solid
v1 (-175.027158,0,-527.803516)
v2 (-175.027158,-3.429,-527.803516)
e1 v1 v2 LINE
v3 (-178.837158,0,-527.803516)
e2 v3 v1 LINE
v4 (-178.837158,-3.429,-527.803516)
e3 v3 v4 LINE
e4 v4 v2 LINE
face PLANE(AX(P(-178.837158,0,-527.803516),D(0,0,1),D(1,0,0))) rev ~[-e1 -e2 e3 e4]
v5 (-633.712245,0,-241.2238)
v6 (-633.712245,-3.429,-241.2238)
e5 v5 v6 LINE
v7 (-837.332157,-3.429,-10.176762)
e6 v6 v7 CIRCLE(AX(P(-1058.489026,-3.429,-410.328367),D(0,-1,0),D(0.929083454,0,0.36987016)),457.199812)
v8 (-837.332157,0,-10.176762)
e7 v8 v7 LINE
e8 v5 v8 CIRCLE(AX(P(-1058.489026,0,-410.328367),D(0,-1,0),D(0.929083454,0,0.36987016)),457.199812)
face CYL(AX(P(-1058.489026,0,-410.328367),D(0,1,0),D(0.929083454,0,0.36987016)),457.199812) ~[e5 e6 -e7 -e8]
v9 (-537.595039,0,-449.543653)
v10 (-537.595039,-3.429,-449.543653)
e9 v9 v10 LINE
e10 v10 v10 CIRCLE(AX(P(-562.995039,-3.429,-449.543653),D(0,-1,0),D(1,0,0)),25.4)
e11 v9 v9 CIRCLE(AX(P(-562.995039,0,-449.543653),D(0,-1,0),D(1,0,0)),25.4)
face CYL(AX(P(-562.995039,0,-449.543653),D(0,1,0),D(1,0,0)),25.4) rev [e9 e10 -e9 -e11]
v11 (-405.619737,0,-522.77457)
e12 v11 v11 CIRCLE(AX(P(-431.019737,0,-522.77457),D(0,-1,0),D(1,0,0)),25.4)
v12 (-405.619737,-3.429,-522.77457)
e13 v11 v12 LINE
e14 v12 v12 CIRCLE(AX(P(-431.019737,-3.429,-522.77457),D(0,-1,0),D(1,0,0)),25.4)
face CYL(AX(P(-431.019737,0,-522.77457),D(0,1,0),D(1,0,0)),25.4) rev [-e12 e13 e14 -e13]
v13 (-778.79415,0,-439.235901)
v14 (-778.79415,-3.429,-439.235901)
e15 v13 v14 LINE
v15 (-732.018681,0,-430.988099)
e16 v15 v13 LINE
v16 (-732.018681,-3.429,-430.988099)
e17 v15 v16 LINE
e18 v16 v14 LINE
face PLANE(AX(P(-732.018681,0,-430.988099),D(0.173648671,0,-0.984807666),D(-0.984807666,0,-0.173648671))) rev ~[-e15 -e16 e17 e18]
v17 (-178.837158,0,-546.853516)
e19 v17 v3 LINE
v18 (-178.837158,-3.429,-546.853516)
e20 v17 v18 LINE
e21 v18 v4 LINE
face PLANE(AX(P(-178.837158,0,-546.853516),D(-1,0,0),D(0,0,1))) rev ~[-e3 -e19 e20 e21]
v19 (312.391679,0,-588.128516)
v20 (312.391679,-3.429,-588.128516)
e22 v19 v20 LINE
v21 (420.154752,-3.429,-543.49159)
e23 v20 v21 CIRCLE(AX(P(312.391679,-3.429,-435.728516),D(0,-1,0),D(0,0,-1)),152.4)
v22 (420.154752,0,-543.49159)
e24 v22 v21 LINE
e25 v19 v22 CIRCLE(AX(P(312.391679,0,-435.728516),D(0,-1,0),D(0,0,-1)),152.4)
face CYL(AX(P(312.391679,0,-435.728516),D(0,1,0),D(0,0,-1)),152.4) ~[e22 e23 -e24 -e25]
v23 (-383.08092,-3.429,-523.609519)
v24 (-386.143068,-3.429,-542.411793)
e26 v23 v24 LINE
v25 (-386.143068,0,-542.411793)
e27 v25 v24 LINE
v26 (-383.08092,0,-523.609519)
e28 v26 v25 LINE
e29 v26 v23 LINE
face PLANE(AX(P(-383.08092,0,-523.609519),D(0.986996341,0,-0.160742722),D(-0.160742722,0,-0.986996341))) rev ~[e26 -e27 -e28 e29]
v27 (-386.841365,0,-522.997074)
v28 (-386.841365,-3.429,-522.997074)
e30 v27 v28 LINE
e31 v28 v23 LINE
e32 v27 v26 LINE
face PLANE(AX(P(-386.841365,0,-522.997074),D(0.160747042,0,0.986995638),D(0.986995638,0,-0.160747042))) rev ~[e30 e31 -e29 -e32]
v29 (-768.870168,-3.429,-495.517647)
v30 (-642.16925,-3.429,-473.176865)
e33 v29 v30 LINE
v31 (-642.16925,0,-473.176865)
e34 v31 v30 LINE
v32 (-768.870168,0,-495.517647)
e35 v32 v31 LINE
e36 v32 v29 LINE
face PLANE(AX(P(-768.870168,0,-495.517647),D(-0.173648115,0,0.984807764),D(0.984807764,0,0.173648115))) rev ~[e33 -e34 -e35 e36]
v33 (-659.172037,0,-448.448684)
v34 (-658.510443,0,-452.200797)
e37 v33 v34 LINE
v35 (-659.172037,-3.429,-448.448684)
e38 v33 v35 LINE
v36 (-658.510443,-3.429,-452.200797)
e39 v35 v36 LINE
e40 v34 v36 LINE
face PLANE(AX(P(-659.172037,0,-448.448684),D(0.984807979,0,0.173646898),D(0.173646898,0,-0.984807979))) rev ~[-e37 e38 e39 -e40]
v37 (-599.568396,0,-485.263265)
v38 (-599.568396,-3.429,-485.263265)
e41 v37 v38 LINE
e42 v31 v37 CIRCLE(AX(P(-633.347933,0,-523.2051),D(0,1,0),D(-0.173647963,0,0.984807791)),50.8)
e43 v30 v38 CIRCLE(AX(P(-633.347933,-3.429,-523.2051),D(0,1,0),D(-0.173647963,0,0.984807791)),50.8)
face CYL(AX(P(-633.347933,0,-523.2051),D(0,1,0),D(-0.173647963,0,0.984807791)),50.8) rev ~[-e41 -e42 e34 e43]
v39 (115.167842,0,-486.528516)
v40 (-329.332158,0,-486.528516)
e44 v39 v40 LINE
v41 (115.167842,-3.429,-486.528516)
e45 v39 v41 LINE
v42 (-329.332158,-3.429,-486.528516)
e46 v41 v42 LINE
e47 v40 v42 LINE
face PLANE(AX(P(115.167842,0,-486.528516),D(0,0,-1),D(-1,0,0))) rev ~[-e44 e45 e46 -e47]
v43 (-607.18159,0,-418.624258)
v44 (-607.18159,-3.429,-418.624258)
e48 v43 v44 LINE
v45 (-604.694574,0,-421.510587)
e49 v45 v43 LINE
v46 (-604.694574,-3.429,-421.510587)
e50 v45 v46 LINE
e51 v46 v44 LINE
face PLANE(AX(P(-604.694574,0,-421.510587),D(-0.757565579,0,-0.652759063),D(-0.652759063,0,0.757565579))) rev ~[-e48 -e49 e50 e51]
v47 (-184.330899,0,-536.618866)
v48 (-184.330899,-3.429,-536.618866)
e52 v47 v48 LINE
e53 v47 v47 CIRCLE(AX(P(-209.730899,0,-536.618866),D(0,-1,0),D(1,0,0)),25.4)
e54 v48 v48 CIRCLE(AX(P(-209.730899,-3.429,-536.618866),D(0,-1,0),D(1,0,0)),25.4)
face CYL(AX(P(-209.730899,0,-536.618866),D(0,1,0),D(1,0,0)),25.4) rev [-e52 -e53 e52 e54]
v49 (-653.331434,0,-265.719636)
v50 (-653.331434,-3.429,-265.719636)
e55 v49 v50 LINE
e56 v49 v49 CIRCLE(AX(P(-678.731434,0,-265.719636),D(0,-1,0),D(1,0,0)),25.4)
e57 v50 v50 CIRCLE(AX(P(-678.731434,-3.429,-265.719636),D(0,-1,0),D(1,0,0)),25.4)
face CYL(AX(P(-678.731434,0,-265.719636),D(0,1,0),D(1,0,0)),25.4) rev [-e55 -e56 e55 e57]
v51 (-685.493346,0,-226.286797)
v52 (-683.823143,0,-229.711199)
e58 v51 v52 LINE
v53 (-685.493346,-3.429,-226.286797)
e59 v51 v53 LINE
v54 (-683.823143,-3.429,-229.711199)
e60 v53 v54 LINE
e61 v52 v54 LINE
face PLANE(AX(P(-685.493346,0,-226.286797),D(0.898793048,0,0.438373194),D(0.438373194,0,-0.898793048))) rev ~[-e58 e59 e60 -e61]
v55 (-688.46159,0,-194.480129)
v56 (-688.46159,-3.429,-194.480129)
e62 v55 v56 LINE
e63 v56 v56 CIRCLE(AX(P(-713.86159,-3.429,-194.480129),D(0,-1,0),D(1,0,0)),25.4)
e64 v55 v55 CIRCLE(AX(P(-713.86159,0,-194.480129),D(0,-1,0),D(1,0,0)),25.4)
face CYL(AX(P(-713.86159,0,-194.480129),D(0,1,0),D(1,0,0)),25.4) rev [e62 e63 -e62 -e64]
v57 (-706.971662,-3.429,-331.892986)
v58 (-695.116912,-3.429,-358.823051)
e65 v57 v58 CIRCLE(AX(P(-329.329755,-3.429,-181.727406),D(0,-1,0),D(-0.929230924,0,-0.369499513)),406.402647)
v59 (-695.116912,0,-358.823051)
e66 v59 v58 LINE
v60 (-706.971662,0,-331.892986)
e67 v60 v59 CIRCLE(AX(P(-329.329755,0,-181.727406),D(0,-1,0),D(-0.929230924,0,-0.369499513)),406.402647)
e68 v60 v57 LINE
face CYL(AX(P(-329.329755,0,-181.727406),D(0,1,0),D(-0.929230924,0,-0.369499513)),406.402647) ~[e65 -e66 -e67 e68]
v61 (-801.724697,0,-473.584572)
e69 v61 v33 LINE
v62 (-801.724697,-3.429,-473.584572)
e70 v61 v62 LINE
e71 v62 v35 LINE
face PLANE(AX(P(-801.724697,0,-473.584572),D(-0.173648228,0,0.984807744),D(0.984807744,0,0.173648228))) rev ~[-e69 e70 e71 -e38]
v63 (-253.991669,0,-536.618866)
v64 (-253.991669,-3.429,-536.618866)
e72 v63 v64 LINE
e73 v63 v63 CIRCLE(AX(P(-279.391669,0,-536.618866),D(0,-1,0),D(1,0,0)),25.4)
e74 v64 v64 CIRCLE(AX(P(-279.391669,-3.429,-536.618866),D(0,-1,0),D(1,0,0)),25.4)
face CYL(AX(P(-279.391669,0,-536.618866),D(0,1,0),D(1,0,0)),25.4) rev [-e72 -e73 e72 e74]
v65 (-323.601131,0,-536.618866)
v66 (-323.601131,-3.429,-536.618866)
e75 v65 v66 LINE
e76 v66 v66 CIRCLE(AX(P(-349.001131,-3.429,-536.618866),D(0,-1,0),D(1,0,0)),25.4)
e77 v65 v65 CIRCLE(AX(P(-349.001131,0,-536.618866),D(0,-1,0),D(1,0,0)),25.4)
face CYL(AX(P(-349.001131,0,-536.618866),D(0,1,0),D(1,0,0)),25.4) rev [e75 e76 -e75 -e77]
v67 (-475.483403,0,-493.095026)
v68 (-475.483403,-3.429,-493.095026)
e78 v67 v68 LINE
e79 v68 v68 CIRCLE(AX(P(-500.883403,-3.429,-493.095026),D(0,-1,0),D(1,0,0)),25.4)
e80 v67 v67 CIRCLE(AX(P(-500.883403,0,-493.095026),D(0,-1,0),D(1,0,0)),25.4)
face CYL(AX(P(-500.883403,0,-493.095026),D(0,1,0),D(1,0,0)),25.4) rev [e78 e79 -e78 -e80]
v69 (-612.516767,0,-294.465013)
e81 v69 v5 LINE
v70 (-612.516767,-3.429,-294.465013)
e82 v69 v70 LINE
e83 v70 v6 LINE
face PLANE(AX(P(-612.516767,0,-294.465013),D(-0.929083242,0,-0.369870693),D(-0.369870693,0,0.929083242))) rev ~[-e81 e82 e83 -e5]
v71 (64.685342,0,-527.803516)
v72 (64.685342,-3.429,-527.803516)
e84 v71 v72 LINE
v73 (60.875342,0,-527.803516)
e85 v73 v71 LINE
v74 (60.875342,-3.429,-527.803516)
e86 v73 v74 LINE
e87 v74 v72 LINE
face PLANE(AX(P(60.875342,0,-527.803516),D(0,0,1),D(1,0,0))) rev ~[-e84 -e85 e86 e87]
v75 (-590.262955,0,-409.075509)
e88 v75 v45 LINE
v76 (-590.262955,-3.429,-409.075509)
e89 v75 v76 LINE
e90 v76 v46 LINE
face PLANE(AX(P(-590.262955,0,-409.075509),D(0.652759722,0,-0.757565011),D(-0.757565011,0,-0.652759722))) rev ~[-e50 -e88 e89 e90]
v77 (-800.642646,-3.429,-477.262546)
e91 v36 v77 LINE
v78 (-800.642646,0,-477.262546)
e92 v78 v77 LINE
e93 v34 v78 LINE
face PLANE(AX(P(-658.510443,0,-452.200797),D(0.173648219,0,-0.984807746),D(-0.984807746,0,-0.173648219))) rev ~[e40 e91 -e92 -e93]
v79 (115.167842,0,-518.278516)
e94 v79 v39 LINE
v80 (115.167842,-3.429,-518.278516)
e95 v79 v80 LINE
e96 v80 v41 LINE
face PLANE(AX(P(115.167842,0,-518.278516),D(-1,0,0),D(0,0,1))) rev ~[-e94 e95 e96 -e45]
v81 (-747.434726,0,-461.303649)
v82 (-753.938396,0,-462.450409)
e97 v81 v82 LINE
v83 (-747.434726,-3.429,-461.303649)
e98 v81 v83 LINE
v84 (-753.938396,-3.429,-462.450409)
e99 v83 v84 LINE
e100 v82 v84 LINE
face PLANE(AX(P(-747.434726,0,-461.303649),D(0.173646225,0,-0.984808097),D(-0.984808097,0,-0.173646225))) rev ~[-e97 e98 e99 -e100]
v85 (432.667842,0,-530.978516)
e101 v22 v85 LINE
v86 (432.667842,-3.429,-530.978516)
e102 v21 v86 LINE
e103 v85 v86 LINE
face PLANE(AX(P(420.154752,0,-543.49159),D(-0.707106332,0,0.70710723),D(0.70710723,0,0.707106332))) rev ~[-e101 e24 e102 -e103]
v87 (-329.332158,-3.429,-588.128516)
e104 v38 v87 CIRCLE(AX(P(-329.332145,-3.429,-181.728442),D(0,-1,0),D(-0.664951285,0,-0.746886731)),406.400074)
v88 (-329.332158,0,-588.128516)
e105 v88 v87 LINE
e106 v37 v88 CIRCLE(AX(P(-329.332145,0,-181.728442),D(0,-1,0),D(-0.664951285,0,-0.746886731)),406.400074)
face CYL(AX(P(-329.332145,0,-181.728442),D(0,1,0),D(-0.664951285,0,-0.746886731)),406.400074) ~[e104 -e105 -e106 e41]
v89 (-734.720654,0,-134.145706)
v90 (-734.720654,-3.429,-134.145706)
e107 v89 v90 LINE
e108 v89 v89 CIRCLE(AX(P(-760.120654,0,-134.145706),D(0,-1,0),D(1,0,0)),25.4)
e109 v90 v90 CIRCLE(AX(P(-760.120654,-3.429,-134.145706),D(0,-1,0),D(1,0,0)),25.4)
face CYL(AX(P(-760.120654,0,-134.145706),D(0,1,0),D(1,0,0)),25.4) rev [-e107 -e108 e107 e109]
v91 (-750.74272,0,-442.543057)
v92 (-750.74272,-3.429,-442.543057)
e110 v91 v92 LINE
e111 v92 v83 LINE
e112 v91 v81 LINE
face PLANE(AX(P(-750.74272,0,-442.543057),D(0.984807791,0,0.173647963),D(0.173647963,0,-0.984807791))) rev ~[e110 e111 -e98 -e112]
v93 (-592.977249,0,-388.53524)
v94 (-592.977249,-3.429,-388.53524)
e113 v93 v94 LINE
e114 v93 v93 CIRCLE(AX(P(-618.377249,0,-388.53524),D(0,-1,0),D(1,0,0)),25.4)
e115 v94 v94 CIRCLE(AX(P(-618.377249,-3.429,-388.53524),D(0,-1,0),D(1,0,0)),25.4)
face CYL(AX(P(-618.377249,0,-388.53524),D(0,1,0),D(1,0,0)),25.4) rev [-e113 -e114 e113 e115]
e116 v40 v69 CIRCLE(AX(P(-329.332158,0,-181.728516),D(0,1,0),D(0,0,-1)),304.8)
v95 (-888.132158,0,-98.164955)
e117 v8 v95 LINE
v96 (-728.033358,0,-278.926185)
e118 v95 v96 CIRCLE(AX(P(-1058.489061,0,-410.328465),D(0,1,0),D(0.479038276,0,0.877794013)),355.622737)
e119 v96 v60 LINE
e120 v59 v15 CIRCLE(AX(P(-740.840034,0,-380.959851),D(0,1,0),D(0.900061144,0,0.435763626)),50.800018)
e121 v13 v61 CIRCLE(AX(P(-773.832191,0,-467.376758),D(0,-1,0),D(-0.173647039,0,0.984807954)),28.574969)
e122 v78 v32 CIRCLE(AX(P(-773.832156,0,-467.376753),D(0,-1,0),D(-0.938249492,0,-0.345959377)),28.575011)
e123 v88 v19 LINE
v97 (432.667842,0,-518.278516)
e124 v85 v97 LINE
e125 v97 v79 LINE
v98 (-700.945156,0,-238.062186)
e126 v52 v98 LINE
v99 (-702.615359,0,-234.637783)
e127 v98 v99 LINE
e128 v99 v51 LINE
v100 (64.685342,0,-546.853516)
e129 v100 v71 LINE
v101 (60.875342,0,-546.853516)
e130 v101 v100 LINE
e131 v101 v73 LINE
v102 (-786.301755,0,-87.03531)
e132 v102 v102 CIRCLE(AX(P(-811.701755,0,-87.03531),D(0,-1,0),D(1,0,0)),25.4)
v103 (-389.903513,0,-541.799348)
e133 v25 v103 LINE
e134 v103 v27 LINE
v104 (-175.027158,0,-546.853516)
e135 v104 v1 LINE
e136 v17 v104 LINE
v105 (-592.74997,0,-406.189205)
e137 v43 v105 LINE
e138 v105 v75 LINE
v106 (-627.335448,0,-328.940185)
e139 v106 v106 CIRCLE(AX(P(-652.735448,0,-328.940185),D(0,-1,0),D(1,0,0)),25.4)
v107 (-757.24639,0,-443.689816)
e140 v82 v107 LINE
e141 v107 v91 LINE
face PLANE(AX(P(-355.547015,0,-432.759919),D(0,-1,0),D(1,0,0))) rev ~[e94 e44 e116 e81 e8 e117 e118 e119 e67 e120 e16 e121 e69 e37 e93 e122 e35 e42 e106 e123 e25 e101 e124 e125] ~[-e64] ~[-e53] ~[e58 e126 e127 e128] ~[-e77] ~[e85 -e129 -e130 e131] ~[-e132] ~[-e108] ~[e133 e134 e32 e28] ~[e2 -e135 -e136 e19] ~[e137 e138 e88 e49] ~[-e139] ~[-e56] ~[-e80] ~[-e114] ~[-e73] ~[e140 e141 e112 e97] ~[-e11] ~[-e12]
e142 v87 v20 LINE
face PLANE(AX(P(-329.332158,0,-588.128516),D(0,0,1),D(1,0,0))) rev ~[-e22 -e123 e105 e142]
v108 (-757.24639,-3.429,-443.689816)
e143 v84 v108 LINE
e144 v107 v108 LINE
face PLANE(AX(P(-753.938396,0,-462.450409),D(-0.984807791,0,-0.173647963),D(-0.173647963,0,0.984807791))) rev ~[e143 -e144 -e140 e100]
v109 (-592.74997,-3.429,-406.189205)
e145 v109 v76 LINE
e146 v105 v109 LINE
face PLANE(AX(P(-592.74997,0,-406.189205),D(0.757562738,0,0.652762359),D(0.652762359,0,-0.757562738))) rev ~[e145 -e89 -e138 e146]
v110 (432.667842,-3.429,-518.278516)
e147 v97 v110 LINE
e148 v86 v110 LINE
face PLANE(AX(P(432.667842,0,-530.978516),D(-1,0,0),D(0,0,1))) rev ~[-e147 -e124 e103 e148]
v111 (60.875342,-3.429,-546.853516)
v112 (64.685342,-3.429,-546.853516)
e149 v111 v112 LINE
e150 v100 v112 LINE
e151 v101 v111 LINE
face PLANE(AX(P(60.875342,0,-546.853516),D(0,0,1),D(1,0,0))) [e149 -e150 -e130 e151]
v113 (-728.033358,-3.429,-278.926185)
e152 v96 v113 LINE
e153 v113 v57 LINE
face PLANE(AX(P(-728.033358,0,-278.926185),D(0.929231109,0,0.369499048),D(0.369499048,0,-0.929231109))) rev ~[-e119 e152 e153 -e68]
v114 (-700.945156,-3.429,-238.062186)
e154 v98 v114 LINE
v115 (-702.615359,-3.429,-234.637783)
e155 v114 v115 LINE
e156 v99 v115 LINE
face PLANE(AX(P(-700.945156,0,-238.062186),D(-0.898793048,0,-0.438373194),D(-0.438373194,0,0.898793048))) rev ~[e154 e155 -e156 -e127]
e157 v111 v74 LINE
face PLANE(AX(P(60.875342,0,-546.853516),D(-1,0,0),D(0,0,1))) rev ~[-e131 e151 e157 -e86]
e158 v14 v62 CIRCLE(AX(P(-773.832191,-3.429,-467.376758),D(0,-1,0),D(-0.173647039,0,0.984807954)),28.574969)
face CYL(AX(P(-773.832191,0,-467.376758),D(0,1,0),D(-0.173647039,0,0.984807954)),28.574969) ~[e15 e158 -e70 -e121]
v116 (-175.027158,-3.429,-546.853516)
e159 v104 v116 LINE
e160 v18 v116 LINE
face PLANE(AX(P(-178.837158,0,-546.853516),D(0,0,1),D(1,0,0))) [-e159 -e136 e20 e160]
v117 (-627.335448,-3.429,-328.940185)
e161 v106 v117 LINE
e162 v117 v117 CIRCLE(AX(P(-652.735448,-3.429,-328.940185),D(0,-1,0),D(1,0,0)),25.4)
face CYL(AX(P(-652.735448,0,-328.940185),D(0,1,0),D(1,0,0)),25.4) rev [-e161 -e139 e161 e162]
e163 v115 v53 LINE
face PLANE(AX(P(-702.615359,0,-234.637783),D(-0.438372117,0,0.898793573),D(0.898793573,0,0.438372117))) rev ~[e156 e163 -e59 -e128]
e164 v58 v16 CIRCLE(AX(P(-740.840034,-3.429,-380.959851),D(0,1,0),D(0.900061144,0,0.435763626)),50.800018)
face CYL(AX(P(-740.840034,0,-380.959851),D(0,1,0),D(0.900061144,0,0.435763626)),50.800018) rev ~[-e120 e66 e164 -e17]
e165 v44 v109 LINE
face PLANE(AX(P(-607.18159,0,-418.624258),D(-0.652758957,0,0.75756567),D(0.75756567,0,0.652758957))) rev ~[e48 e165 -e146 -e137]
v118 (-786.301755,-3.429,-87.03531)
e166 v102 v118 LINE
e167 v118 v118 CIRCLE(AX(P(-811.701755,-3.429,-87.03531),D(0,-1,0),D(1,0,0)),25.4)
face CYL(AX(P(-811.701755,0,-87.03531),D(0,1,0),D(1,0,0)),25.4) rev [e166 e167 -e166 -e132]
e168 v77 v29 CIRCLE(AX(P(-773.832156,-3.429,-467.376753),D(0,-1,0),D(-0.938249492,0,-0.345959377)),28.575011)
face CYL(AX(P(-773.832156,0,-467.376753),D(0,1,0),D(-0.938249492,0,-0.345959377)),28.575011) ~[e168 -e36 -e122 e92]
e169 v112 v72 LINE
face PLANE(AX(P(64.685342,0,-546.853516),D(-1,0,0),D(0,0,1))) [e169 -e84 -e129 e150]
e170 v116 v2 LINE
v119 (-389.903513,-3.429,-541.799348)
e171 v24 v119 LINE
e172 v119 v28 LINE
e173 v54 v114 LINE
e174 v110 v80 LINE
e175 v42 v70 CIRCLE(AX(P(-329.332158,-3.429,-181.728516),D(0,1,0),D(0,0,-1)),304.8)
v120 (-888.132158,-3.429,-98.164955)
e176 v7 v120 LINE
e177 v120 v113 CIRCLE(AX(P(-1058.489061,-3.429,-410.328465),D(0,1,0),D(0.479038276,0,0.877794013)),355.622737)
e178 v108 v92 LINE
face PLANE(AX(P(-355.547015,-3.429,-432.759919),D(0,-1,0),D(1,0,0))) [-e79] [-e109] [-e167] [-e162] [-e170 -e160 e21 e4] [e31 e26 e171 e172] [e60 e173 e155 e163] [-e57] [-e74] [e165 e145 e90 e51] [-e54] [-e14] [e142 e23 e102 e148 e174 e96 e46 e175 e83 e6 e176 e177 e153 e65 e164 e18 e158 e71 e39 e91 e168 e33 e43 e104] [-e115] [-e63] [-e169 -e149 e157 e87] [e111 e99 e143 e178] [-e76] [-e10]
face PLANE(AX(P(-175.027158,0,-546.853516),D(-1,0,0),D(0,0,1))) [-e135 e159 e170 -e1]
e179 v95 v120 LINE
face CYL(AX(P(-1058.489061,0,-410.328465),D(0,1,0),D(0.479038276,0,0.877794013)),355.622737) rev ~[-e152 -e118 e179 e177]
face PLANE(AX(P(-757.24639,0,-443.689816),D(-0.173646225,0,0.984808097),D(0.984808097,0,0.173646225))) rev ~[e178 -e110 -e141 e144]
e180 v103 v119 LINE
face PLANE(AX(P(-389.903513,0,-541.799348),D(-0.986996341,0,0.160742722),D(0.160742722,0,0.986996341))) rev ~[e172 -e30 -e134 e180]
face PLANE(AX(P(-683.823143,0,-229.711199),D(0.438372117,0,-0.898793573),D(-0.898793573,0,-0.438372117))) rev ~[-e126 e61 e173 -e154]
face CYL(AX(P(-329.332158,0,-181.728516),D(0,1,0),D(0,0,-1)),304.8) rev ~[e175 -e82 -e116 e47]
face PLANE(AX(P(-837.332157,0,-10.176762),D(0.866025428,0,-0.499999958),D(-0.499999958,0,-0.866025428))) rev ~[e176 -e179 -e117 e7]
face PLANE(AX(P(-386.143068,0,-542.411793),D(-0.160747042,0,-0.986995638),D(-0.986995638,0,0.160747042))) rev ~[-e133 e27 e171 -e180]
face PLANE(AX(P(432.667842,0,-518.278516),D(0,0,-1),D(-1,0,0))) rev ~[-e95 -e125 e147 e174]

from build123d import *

# Parameters (mm, degrees)
F0_R     = 25.4
F0_W     = 3.81
F0_H     = 19.05
F1_DEPTH = 3.429


# Not quite as in the source:
# - ends of sketch curves that miss each other by under 0.0002 mm in the source are joined


with BuildPart() as f1:
    # F0 (on Front) → F1 (new body)
    with BuildSketch(Plane.XZ):
        with BuildLine():
            ThreePointArc((-642.1692497265, -473.1768646252), (-619.4825639758, -474.3339275445), (-599.5683960075, -485.2632650852))
            ThreePointArc((-599.5683960075, -485.2632650852), (-473.9081608396, -561.5426017902), (-329.3321582, -588.1285164))
            Line((-329.3321582, -588.1285164), (312.391679, -588.1285164))
            ThreePointArc((312.391679, -588.1285164), (370.7126340924, -576.5277571547), (420.1547524528, -543.4915898528))
            Line((420.1547524528, -543.4915898528), (432.6678418, -530.9785164))
            Line((432.6678418, -530.9785164), (432.6678418, -518.2785164))
            Line((432.6678418, -518.2785164), (115.1678418, -518.2785164))
            Line((115.1678418, -518.2785164), (115.1678418, -486.5285164))
            Line((115.1678418, -486.5285164), (-329.3321582, -486.5285164))
            ThreePointArc((-329.3321582, -486.5285164), (-500.4183293998, -433.9834708096), (-612.5167665735, -294.4650126217))
            Line((-612.5167665735, -294.4650126217), (-633.7122454, -241.2238))
            ThreePointArc((-633.7122454, -241.2238), (-715.4828245955, -108.0397407431), (-837.3321571082, -10.1767620246))
            Line((-837.3321571082, -10.1767620246), (-888.1321582, -98.1649548))
            ThreePointArc((-888.1321582, -98.1649548), (-792.2711581527, -174.5413586603), (-728.0333576386, -278.9261845185))
            Line((-728.0333576386, -278.9261845185), (-706.971662, -331.8929862))
            ThreePointArc((-706.971662, -331.8929862), (-701.288086285, -345.465340488), (-695.1169115223, -358.8230511462))
            ThreePointArc((-695.1169115223, -358.8230511462), (-695.6103607346, -404.0881567784), (-732.0186808394, -430.9880994311))
            Line((-732.0186808394, -430.9880994311), (-778.7941498, -439.2359008))
            ThreePointArc((-778.7941498, -439.2359008), (-797.5979576606, -451.5111596623), (-801.724697479, -473.5845717908))
            Line((-801.724697479, -473.5845717908), (-659.172037, -448.448684))
            Line((-659.172037, -448.448684), (-658.5104432, -452.2007974))
            Line((-658.5104432, -452.2007974), (-800.6426456, -477.2625456))
            ThreePointArc((-800.6426456, -477.2625456), (-788.0677244467, -492.1533513081), (-768.8701676538, -495.5176466233))
            Line((-768.8701676538, -495.5176466233), (-642.1692497265, -473.1768646252))
        make_face()
        Polygon((-753.9383956, -462.4504086), (-757.24639, -443.6898162), (-750.74272, -442.543057), (-747.4347256, -461.3036494), align=None, mode=Mode.SUBTRACT)
        with Locations((-562.9950386, -449.5436526)):
            Circle(F0_R, mode=Mode.SUBTRACT)
        with Locations((-431.0197374, -522.7745704)):
            Circle(F0_R, mode=Mode.SUBTRACT)
        with Locations((-349.0011308, -536.6188658)):
            Circle(F0_R, mode=Mode.SUBTRACT)
        Polygon((-383.0809204, -523.6095192), (-386.1430682, -542.411793), (-389.9035128, -541.7993482), (-386.841365, -522.9970744), align=None, mode=Mode.SUBTRACT)
        with Locations((-279.3916688, -536.6188658)):
            Circle(F0_R, mode=Mode.SUBTRACT)
        with Locations((-500.8834026, -493.095026)):
            Circle(F0_R, mode=Mode.SUBTRACT)
        Polygon((-590.2629546, -409.075509), (-604.6945742, -421.510587), (-607.1815898, -418.624258), (-592.7499702, -406.1892054), align=None, mode=Mode.SUBTRACT)
        with Locations((-618.3772494, -388.5352402)):
            Circle(F0_R, mode=Mode.SUBTRACT)
        with Locations((-652.7354484, -328.9401854)):
            Circle(F0_R, mode=Mode.SUBTRACT)
        with Locations((-209.7308988, -536.6188658)):
            Circle(F0_R, mode=Mode.SUBTRACT)
        with Locations((-176.9321582, -537.3285164)):
            Rectangle(F0_W, F0_H, mode=Mode.SUBTRACT)
        with Locations((62.7803418, -537.3285164)):
            Rectangle(F0_W, F0_H, mode=Mode.SUBTRACT)
        with Locations((-678.731434, -265.7196362)):
            Circle(F0_R, mode=Mode.SUBTRACT)
        Polygon((-683.8231434, -229.7111992), (-700.9451564, -238.0621858), (-702.6153588, -234.6377832), (-685.4933458, -226.2867966), align=None, mode=Mode.SUBTRACT)
        with Locations((-713.8615898, -194.4801292)):
            Circle(F0_R, mode=Mode.SUBTRACT)
        with Locations((-760.120654, -134.1457058)):
            Circle(F0_R, mode=Mode.SUBTRACT)
        with Locations((-811.7017548, -87.0353098)):
            Circle(F0_R, mode=Mode.SUBTRACT)
    extrude(amount=F1_DEPTH)


solid = f1.part
